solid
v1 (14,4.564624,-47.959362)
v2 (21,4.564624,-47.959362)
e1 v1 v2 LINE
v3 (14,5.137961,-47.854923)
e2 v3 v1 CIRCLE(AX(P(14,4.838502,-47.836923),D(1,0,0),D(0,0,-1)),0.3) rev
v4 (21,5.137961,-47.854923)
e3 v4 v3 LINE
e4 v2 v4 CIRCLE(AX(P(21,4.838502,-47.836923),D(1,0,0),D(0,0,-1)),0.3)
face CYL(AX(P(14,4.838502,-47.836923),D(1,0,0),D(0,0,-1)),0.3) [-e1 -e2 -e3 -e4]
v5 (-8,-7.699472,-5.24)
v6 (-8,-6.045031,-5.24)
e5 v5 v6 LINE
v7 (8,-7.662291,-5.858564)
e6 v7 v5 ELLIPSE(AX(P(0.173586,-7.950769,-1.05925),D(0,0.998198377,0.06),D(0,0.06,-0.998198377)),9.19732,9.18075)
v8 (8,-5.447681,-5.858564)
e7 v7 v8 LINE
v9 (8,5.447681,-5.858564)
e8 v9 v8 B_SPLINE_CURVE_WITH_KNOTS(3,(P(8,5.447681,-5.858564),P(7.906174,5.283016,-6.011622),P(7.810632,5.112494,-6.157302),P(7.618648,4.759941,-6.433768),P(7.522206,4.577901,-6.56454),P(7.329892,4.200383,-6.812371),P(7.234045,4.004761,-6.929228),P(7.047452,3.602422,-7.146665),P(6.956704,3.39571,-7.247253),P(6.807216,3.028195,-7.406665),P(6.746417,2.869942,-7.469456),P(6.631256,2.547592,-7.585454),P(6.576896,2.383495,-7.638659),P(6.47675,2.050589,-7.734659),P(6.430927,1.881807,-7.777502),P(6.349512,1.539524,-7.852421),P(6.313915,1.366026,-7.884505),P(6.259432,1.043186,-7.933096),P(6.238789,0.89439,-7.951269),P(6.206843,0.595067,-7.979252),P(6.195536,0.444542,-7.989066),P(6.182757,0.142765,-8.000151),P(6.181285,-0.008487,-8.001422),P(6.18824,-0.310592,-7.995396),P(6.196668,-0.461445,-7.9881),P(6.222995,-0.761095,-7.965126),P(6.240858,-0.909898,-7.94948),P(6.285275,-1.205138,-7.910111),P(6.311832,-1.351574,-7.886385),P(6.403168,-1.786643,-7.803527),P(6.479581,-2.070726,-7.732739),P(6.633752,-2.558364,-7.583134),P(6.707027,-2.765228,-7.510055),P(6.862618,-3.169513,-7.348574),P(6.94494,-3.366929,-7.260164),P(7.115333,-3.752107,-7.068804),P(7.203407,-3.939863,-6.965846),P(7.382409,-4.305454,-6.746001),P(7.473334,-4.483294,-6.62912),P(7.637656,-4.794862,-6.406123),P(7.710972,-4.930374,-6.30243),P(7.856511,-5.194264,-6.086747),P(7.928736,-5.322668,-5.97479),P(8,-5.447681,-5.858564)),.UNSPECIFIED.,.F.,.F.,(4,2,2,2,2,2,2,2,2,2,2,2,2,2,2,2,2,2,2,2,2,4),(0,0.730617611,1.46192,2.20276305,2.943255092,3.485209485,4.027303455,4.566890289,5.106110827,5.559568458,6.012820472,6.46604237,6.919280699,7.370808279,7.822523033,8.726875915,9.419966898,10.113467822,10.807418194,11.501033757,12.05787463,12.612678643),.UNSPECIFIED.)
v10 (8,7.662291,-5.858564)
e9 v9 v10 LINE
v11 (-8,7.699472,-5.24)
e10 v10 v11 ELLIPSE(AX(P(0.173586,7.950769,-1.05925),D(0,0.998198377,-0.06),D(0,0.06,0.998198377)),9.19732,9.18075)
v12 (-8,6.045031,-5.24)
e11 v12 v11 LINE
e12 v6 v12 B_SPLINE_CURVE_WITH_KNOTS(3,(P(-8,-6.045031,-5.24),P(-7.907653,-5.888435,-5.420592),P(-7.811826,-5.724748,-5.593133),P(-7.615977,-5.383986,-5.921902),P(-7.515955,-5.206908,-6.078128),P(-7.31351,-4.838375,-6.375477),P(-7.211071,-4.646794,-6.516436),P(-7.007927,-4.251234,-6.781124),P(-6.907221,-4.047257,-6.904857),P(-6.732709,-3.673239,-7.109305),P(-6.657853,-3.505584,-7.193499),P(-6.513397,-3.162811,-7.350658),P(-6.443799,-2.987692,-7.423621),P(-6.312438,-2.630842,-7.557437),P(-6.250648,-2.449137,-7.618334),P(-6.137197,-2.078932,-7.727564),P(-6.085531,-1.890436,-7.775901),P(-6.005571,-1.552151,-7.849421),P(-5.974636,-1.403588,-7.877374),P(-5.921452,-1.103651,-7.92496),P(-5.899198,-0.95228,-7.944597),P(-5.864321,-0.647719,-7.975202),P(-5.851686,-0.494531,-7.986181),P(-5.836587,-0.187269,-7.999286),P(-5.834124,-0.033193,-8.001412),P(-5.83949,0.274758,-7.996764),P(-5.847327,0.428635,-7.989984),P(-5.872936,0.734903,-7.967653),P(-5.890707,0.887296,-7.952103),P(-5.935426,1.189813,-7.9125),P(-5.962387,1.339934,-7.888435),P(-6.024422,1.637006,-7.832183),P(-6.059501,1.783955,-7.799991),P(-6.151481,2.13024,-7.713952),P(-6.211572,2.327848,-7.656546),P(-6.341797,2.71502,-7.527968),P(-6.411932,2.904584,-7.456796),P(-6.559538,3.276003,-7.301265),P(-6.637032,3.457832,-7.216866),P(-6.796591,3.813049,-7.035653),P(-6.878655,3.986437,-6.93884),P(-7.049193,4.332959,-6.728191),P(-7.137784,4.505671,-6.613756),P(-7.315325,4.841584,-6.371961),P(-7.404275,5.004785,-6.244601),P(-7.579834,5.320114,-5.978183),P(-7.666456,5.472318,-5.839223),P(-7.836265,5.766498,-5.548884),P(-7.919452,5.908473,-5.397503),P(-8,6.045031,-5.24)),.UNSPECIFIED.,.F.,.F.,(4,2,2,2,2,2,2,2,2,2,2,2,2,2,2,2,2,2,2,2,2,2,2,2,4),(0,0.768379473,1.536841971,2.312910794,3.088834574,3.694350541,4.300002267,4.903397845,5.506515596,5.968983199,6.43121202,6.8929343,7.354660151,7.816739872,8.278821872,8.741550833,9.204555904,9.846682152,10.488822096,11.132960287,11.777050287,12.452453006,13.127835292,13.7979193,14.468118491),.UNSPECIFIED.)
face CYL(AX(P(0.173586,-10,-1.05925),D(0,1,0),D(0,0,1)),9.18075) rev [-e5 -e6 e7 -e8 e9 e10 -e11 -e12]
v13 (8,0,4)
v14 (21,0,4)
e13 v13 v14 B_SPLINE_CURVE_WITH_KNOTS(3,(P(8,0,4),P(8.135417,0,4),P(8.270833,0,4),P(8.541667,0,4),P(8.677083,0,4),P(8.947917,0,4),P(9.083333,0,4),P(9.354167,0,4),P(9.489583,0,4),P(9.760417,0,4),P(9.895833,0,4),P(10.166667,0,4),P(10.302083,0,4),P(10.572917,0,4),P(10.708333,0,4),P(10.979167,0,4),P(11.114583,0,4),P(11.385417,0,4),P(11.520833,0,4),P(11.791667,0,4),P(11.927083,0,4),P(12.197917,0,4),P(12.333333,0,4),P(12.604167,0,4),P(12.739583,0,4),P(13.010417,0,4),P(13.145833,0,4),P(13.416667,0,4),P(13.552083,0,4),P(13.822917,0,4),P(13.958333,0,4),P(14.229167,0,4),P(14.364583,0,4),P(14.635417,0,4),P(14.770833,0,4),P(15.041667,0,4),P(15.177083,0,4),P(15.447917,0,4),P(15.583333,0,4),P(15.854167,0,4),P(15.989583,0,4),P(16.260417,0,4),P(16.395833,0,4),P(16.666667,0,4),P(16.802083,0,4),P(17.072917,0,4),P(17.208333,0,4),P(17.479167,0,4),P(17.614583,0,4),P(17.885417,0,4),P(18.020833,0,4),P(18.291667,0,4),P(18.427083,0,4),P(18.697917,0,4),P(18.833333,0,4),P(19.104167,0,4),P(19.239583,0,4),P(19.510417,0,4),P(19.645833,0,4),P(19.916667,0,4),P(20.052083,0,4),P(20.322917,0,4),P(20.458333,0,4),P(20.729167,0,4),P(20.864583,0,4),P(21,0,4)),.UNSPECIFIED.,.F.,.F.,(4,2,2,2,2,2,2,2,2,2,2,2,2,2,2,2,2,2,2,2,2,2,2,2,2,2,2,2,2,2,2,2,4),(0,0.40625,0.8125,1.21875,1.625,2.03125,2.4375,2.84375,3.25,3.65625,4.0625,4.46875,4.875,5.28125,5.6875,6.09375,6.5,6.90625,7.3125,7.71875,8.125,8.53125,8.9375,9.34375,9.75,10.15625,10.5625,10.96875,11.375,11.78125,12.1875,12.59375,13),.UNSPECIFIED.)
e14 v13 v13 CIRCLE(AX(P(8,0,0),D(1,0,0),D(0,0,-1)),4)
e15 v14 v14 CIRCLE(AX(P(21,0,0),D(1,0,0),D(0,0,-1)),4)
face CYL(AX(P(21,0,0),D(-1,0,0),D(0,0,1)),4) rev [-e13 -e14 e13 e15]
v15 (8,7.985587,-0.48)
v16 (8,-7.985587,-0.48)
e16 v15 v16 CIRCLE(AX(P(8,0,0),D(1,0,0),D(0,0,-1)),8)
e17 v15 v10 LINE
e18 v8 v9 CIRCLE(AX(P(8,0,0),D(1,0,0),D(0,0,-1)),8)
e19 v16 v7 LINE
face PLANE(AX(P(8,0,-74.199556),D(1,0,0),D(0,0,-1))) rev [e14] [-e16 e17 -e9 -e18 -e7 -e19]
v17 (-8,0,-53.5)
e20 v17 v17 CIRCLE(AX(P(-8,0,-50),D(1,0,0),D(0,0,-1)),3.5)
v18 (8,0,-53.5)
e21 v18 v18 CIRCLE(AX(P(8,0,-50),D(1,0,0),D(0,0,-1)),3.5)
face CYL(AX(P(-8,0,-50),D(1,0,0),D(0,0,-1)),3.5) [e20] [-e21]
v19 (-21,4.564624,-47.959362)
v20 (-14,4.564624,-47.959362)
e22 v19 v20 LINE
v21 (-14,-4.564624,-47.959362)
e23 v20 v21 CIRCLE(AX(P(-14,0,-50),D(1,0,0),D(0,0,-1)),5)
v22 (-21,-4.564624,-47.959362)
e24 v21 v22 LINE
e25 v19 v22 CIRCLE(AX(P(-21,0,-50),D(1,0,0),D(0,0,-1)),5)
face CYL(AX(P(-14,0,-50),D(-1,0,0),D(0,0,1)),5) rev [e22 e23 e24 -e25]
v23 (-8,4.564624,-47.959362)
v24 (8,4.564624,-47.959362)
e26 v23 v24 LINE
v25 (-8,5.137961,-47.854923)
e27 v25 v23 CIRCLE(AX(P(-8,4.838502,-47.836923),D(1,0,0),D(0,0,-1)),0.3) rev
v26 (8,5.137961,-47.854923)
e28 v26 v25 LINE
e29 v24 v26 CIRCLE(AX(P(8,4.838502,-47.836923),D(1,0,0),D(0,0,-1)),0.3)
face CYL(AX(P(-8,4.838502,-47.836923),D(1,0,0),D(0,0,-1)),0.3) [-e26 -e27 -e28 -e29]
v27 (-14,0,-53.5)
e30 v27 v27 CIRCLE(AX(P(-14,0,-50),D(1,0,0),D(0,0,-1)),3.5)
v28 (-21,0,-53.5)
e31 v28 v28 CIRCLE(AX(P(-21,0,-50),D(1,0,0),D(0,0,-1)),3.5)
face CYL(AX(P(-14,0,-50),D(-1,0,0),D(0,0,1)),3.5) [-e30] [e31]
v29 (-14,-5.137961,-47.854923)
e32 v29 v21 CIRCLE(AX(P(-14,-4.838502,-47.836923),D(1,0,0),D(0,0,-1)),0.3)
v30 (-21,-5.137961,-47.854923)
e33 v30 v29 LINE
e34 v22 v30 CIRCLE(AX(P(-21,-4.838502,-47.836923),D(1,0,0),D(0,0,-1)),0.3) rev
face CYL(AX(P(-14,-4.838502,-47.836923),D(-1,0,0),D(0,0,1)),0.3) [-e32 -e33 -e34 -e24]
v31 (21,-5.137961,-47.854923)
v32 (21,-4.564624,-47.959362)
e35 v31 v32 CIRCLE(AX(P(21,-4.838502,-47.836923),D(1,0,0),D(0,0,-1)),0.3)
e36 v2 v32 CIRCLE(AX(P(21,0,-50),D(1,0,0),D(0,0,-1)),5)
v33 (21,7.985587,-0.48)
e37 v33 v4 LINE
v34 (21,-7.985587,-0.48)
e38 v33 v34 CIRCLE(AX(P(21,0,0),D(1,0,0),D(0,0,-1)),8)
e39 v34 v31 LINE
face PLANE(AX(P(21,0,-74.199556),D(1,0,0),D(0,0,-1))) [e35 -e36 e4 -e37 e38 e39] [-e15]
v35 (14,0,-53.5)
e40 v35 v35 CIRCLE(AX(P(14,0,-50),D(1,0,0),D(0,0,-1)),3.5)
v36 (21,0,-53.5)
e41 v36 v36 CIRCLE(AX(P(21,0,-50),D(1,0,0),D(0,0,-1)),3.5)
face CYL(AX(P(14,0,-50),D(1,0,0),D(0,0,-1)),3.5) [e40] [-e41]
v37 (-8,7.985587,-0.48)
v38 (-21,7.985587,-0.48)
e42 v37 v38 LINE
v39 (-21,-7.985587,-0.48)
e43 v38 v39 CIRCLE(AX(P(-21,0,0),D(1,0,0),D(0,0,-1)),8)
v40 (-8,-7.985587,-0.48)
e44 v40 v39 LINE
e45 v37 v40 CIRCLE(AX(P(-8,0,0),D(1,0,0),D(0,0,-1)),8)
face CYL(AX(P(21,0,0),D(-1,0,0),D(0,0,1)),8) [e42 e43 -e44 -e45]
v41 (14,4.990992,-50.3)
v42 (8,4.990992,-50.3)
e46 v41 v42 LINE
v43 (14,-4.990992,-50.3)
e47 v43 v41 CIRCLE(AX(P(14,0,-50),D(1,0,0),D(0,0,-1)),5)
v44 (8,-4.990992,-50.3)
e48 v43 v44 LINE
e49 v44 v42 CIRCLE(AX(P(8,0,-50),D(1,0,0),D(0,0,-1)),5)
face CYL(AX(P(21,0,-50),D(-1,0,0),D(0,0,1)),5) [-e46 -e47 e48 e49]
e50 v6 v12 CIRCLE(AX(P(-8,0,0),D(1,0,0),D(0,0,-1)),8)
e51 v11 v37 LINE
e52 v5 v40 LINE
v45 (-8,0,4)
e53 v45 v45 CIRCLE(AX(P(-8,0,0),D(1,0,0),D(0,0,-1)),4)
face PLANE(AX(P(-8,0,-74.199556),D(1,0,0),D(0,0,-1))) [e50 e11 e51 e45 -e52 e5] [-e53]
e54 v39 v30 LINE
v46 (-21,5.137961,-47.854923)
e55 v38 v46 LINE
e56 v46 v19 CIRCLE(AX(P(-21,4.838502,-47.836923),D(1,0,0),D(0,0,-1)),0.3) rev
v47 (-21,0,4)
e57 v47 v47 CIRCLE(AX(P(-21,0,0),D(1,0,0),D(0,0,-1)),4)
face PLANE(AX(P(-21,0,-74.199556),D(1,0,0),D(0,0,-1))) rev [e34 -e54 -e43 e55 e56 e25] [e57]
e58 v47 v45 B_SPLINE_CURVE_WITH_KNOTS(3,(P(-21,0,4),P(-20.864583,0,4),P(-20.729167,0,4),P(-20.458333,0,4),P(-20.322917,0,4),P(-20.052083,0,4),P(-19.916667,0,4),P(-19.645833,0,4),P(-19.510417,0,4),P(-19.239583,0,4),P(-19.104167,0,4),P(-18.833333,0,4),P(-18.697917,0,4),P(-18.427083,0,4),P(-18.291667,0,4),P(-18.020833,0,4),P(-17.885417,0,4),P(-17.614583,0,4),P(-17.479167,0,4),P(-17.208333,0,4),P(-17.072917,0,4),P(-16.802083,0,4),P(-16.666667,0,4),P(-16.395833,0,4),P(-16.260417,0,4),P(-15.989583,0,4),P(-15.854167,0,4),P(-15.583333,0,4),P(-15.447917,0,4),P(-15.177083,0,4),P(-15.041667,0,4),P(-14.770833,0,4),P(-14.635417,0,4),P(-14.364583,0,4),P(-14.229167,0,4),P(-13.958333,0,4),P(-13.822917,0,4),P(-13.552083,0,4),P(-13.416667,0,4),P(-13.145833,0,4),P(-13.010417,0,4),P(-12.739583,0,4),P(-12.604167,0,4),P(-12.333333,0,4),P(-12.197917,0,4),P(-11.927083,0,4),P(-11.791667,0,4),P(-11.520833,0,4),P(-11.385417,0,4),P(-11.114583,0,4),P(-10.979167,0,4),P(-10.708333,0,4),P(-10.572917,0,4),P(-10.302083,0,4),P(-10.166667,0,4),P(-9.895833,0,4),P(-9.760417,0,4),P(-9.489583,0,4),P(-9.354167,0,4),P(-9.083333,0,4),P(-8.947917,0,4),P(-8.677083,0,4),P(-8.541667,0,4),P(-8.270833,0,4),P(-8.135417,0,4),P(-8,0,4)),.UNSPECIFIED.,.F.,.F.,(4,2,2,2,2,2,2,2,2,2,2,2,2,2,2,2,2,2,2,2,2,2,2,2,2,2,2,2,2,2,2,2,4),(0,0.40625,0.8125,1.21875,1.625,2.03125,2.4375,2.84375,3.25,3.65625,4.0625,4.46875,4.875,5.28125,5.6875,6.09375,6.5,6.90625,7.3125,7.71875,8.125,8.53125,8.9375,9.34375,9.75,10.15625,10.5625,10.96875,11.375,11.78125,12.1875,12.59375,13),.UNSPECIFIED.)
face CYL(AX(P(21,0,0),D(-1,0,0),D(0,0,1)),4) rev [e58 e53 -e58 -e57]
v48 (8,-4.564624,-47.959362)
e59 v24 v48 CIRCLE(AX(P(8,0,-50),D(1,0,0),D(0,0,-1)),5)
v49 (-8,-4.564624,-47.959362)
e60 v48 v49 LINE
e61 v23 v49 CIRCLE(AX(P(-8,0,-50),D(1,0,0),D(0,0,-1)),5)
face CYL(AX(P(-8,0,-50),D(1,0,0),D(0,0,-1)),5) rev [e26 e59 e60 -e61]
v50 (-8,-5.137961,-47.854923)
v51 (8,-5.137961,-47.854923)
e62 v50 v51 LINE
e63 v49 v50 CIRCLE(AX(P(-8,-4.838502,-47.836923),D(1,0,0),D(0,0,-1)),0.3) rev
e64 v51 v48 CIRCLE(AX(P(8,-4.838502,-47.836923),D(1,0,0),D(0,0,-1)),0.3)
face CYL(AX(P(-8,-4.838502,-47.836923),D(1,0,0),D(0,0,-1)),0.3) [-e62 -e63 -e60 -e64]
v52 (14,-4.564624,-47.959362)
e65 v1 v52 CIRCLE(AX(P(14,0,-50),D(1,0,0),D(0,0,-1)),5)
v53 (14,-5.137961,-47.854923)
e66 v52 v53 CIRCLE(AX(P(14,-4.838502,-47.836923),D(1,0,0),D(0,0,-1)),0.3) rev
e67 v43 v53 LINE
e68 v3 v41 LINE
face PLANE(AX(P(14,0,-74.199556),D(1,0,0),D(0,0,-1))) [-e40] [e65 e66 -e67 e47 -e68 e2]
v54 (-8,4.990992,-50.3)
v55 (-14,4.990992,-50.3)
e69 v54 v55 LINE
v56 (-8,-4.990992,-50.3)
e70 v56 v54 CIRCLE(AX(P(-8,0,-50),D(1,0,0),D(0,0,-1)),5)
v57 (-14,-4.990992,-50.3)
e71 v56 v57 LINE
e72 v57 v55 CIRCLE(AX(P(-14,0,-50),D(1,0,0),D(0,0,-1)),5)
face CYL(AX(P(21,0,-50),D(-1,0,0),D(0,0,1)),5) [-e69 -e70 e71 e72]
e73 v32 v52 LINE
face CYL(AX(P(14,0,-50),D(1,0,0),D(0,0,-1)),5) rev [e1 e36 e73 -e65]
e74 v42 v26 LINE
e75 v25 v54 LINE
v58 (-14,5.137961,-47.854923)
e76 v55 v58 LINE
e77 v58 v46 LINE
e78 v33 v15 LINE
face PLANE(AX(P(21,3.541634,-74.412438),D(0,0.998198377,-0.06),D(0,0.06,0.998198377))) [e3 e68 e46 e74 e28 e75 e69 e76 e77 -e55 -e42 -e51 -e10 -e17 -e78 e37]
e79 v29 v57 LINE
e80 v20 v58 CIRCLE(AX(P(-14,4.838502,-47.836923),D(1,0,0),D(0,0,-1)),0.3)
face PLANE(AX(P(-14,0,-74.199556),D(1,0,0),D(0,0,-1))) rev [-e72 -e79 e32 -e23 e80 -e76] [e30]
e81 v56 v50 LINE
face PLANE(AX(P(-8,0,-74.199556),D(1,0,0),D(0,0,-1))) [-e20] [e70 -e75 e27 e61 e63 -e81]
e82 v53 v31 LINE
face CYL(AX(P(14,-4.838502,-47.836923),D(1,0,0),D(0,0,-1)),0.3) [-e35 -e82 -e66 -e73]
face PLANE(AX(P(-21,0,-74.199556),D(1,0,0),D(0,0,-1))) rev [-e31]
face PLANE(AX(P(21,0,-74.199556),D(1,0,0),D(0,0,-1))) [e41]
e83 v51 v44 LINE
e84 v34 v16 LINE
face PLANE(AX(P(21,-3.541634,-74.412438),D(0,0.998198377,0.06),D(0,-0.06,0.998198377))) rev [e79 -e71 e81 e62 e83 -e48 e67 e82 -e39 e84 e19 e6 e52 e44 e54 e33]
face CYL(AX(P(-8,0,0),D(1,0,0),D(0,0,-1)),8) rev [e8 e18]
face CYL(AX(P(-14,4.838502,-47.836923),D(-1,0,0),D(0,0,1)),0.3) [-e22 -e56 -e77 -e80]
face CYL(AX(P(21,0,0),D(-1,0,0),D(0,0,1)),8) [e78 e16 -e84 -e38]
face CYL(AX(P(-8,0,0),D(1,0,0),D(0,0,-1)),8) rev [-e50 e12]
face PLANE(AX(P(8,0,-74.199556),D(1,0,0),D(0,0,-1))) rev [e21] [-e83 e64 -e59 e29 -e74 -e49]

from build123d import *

# Parameters (mm, degrees)
SKETCH1_R           = 8
SKETCH1_R_2         = 4
SKETCH1_R_3         = 5
SKETCH1_R_4         = 3.5
BOSS_EXTRUDE1_DEPTH = 21
SKETCH1_4_R         = 8
SKETCH1_4_R_2       = 4
CUT_EXTRUDE1_DEPTH  = 8
SKETCH1_5_R         = 5
SKETCH1_5_R_2       = 3.5
CUT_EXTRUDE2_DEPTH  = 8
CUT_EXTRUDE3_START  = 21
SKETCH1_6_R         = 5
SKETCH1_6_R_2       = 3.5
CUT_EXTRUDE3_DEPTH  = 7
CUT_EXTRUDE4_START  = -14
SKETCH1_7_R         = 5
SKETCH1_7_R_2       = 3.5
CUT_EXTRUDE4_DEPTH  = 7
FILLET2_START       = -8
FILLET2_DEPTH       = 16
FILLET2_START_2     = -22
FILLET2_2_DEPTH     = 8
FILLET2_START_3     = 14
FILLET2_3_DEPTH     = 8
CUT_EXTRUDE5_DEPTH  = 10


with BuildPart() as part:
    # Sketch1 → Boss-Extrude1 (new, symmetric)
    # profile 1 of 4: a face of its own
    with BuildSketch(Plane(origin=(0, 0, 0), x_dir=(0, 0, -1), z_dir=(1, 0, 0))):
        with BuildLine():
            Line((50.3, 4.990991885), (0.48, 7.985587017))
            ThreePointArc((0.48, 7.985587017), (5.824087911, 5.48452368), (8, 0))
            ThreePointArc((8, 0), (5.824087911, -5.48452368), (0.48, -7.985587017))
            Line((0.48, -7.985587017), (50.3, -4.990991885))
            ThreePointArc((50.3, -4.990991885), (45, 0), (50.3, 4.990991885))
        make_face()
    # profile 2 of 4: a face of its own
    with BuildSketch(Plane(origin=(0, 0, 0), x_dir=(0, 0, -1), z_dir=(1, 0, 0))):
        Circle(SKETCH1_R)
        with Locations(Location((0, 0, 0), (0, 0, 180))):
            Circle(SKETCH1_R_2, mode=Mode.SUBTRACT)
    # profile 3 of 4: a face of its own
    with BuildSketch(Plane(origin=(0, 0, 0), x_dir=(0, 0, -1), z_dir=(1, 0, 0))):
        with Locations((50, 0)):
            Circle(SKETCH1_R_3)
        with Locations((50, 0)):
            Circle(SKETCH1_R_4, mode=Mode.SUBTRACT)
    # profile 4 of 4: a face of its own
    with BuildSketch(Plane(origin=(0, 0, 0), x_dir=(0, 0, -1), z_dir=(1, 0, 0))):
        with Locations((50, 0)):
            Circle(SKETCH1_R_4)
    extrude(amount=BOSS_EXTRUDE1_DEPTH, both=True)

    # Sketch1<4> → Cut-Extrude1 (cut, symmetric)
    with BuildSketch(Plane(origin=(0, 0, 0), x_dir=(0, 0, -1), z_dir=(1, 0, 0))):
        Circle(SKETCH1_4_R)
        with Locations(Location((0, 0, 0), (0, 0, 180))):
            Circle(SKETCH1_4_R_2, mode=Mode.SUBTRACT)
    extrude(amount=CUT_EXTRUDE1_DEPTH, both=True, mode=Mode.SUBTRACT)

    # Sketch1<5> → Cut-Extrude2 (cut, symmetric)
    with BuildSketch(Plane(origin=(0, 0, 0), x_dir=(0, 0, -1), z_dir=(1, 0, 0))):
        with Locations((50, 0)):
            Circle(SKETCH1_5_R)
        with Locations((50, 0)):
            Circle(SKETCH1_5_R_2, mode=Mode.SUBTRACT)
    extrude(amount=CUT_EXTRUDE2_DEPTH, both=True, mode=Mode.SUBTRACT)

    # Sketch1<6> → Cut-Extrude3 (cut)
    with BuildSketch(Plane(origin=(0, 0, 0), x_dir=(0, 0, -1), z_dir=(1, 0, 0)).offset(CUT_EXTRUDE3_START)):
        with Locations((50, 0)):
            Circle(SKETCH1_6_R)
        with Locations((50, 0)):
            Circle(SKETCH1_6_R_2, mode=Mode.SUBTRACT)
    extrude(amount=-CUT_EXTRUDE3_DEPTH, mode=Mode.SUBTRACT)

    # Sketch1<7> → Cut-Extrude4 (cut)
    with BuildSketch(Plane(origin=(0, 0, 0), x_dir=(0, 0, -1), z_dir=(1, 0, 0)).offset(CUT_EXTRUDE4_START)):
        with Locations((50, 0)):
            Circle(SKETCH1_7_R)
        with Locations((50, 0)):
            Circle(SKETCH1_7_R_2, mode=Mode.SUBTRACT)
    extrude(amount=-CUT_EXTRUDE4_DEPTH, mode=Mode.SUBTRACT)

    # Fillet2: read off the stored shape, not the designer's step
    # Fillet2 outline → Fillet2 (cut)
    with BuildSketch(Plane.YZ.offset(FILLET2_START)):
        with BuildLine():
            ThreePointArc((-4.990991885, -50.3), (-4.9190545, -49.10395155), (-4.564624299, -47.959361617))
            ThreePointArc((-4.564624299, -47.959361617), (-4.892264664, -48.132066584), (-5.13796127, -47.854923314))
            Line((-5.13796127, -47.854923314), (-4.990991885, -50.3))
        make_face()
        with BuildLine():
            ThreePointArc((5.13796127, -47.854923314), (4.892264664, -48.132066584), (4.564624299, -47.959361617))
            ThreePointArc((4.564624299, -47.959361617), (4.9190545, -49.10395155), (4.990991885, -50.3))
            Line((4.990991885, -50.3), (5.13796127, -47.854923314))
        make_face()
    extrude(amount=FILLET2_DEPTH, mode=Mode.SUBTRACT)

    # Fillet2 2 outline → Fillet2 2 (cut)
    with BuildSketch(Plane.YZ.offset(FILLET2_START_2)):
        with BuildLine():
            ThreePointArc((-4.990991885, -50.3), (-4.9190545, -49.10395155), (-4.564624299, -47.959361617))
            ThreePointArc((-4.564624299, -47.959361617), (-4.892264664, -48.132066584), (-5.13796127, -47.854923314))
            Line((-5.13796127, -47.854923314), (-4.990991885, -50.3))
        make_face()
        with BuildLine():
            ThreePointArc((5.13796127, -47.854923314), (4.892264664, -48.132066584), (4.564624299, -47.959361617))
            ThreePointArc((4.564624299, -47.959361617), (4.9190545, -49.10395155), (4.990991885, -50.3))
            Line((4.990991885, -50.3), (5.13796127, -47.854923314))
        make_face()
    extrude(amount=FILLET2_2_DEPTH, mode=Mode.SUBTRACT)

    # Fillet2 3 outline → Fillet2 3 (cut)
    with BuildSketch(Plane.YZ.offset(FILLET2_START_3)):
        with BuildLine():
            ThreePointArc((-4.990991885, -50.3), (-4.9190545, -49.10395155), (-4.564624299, -47.959361617))
            ThreePointArc((-4.564624299, -47.959361617), (-4.892264664, -48.132066584), (-5.13796127, -47.854923314))
            Line((-5.13796127, -47.854923314), (-4.990991885, -50.3))
        make_face()
        with BuildLine():
            ThreePointArc((5.13796127, -47.854923314), (4.892264664, -48.132066584), (4.564624299, -47.959361617))
            ThreePointArc((4.564624299, -47.959361617), (4.9190545, -49.10395155), (4.990991885, -50.3))
            Line((4.990991885, -50.3), (5.13796127, -47.854923314))
        make_face()
    extrude(amount=FILLET2_3_DEPTH, mode=Mode.SUBTRACT)

    # Sketch3 → Cut-Extrude5 (cut, symmetric)
    with BuildSketch(Plane(origin=(0, 0, 0), x_dir=(1, 0, 0), z_dir=(0, 1, 0))):
        with BuildLine():
            Line((-8, -3.76), (8, -3.76))
            Line((8, -3.76), (8, 5.858563907))
            ThreePointArc((8, 5.858563907), (-0.18107936, 10.23314684), (-8, 5.24))
            Line((-8, 5.24), (-8, -3.76))
        make_face()
    extrude(amount=CUT_EXTRUDE5_DEPTH, both=True, mode=Mode.SUBTRACT)


solid = part.part
